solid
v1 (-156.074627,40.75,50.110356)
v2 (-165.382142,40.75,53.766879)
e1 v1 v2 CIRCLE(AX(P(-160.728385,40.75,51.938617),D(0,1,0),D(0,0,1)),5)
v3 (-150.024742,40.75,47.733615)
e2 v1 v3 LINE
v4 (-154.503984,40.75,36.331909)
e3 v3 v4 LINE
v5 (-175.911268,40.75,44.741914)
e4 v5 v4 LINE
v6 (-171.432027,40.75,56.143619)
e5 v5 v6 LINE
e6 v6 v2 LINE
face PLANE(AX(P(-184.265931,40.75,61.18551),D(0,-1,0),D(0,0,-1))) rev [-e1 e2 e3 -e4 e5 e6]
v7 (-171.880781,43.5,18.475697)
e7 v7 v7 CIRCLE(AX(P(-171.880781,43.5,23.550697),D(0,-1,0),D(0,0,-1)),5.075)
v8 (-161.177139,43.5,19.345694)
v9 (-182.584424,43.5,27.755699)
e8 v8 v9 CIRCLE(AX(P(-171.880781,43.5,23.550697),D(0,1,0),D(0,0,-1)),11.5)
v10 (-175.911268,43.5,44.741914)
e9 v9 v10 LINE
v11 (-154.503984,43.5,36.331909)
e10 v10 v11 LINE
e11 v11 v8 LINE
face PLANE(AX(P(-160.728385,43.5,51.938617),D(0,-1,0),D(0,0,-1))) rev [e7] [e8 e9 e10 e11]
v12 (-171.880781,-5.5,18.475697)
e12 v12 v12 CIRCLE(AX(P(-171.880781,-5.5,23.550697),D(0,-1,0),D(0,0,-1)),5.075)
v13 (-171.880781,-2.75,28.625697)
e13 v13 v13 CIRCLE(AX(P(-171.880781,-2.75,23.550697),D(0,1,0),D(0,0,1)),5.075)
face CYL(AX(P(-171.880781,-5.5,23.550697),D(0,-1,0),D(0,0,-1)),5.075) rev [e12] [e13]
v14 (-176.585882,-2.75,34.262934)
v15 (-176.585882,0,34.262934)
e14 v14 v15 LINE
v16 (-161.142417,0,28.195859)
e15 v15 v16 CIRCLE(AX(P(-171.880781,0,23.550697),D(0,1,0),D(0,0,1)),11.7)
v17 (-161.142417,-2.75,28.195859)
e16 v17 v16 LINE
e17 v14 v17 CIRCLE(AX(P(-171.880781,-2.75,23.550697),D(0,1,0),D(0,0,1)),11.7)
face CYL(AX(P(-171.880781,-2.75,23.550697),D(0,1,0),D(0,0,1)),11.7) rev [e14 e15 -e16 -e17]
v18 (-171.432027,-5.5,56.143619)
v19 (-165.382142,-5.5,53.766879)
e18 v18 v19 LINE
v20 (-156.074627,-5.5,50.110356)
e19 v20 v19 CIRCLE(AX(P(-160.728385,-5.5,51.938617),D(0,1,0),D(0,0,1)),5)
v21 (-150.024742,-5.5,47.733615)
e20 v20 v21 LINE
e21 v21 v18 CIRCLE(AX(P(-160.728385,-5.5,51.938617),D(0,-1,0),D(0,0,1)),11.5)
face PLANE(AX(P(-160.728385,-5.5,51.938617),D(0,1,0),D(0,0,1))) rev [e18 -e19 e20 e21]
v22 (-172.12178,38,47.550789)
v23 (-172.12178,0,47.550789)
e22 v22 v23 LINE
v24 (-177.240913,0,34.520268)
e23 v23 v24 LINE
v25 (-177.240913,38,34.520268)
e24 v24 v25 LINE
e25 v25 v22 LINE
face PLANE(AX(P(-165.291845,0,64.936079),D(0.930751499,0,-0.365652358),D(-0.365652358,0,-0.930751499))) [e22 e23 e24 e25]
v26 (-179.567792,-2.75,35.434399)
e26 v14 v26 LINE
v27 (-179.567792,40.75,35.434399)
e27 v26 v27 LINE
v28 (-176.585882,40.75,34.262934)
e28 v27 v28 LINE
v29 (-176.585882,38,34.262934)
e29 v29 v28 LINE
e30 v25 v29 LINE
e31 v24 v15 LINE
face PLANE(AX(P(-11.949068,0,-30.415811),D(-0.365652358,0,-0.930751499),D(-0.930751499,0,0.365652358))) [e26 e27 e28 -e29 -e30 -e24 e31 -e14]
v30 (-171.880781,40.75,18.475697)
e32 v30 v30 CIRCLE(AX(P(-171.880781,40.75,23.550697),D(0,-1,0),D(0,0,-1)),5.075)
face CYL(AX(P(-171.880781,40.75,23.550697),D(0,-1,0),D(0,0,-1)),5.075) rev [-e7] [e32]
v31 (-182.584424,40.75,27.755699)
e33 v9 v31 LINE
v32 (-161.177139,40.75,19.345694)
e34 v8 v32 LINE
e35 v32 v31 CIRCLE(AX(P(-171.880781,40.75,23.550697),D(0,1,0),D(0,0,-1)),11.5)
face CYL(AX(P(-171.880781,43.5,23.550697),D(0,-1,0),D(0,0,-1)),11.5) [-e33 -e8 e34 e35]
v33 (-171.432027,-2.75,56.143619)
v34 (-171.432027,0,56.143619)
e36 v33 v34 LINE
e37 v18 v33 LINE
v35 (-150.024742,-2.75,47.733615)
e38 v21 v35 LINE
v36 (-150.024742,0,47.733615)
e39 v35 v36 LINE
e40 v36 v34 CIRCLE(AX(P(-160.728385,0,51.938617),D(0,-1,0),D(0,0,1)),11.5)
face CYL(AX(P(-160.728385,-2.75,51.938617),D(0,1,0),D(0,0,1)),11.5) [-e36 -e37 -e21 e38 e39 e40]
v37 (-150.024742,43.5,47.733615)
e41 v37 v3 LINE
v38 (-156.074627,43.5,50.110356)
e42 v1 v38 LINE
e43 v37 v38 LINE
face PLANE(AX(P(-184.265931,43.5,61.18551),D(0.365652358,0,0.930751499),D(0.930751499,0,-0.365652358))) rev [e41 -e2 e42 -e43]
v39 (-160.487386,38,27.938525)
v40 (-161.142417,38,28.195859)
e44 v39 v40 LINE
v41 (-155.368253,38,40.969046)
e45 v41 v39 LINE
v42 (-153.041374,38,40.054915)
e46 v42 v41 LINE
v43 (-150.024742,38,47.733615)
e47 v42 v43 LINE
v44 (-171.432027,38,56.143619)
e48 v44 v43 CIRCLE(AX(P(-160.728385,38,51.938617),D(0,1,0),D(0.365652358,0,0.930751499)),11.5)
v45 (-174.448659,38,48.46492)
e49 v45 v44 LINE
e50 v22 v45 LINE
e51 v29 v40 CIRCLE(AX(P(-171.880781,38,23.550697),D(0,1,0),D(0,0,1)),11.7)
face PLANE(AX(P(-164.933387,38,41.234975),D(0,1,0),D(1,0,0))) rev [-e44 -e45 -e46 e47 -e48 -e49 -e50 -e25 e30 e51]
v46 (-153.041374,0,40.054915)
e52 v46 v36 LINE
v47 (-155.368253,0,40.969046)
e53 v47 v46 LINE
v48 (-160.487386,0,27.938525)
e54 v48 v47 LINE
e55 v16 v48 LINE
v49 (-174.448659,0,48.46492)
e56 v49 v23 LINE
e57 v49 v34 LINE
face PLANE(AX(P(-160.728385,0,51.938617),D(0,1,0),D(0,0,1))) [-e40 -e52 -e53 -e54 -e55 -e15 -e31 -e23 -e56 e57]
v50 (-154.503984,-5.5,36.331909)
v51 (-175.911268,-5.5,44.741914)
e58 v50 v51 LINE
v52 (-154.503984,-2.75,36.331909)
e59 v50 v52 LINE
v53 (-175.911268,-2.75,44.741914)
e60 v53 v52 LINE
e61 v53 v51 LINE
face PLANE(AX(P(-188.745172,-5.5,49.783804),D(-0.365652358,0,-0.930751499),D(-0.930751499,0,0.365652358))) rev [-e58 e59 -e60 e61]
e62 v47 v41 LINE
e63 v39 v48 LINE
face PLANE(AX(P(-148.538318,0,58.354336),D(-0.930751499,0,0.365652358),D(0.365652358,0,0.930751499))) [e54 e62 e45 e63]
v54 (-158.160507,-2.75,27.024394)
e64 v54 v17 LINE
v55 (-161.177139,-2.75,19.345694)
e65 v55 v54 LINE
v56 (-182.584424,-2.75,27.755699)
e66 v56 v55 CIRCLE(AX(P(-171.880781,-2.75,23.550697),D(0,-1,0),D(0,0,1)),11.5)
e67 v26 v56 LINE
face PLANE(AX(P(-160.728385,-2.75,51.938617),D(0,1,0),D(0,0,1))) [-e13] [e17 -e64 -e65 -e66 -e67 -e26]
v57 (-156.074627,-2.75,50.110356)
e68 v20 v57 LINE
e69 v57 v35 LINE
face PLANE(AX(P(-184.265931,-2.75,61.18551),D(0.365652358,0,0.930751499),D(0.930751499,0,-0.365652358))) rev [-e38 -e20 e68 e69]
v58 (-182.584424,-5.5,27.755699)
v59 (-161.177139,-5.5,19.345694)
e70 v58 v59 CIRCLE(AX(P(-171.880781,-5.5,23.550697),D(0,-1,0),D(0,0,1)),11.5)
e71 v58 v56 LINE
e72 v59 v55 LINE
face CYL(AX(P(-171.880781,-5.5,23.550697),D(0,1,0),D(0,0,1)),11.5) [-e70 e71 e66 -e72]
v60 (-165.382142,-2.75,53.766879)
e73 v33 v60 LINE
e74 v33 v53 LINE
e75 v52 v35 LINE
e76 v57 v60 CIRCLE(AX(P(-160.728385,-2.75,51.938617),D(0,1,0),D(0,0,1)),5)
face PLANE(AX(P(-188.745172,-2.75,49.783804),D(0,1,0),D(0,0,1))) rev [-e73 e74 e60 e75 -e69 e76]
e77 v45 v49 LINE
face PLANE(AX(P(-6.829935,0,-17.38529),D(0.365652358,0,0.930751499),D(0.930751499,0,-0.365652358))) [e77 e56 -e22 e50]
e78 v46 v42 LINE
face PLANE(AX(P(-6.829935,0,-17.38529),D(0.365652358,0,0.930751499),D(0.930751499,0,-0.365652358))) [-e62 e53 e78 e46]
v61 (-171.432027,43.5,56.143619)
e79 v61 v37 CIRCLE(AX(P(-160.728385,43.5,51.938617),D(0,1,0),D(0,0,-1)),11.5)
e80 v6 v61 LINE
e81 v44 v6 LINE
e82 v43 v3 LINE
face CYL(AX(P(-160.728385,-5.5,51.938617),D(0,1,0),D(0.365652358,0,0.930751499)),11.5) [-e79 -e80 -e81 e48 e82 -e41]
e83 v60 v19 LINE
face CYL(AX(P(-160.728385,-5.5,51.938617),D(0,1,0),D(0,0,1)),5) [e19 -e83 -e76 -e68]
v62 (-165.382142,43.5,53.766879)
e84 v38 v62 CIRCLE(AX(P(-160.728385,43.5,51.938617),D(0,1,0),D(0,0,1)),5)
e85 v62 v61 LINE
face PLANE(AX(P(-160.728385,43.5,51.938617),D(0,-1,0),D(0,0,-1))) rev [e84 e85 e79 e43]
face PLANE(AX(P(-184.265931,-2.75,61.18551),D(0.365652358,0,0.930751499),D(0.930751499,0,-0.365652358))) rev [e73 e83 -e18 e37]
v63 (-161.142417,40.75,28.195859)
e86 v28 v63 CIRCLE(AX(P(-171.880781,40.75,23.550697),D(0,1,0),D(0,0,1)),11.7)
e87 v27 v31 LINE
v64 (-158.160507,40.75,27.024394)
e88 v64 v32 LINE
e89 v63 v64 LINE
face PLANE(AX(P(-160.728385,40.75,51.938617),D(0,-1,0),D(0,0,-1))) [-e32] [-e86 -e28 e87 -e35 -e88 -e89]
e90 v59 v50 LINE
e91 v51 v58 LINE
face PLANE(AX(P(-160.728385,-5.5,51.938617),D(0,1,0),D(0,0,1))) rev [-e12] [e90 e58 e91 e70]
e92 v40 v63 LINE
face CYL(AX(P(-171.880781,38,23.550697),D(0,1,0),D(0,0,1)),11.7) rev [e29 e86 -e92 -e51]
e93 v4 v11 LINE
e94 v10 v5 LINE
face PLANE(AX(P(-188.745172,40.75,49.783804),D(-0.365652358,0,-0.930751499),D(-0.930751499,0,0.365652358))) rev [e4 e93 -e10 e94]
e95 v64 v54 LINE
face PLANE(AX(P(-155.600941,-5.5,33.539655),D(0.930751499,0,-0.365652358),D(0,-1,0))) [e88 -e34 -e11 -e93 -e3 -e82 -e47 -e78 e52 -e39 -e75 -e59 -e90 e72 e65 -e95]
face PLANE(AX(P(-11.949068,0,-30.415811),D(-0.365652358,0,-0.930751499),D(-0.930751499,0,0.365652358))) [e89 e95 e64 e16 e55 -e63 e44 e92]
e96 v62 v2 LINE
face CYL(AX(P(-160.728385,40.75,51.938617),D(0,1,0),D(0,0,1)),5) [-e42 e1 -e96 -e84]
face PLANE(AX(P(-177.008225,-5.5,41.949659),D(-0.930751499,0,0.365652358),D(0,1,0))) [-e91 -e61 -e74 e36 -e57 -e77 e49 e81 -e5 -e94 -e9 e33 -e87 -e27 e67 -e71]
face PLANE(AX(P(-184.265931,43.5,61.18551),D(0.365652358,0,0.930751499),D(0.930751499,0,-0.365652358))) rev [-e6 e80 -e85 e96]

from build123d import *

# Parameters (mm, degrees)
SALIENTE_EXTRUIR1_START   = -2.75
SALIENTE_EXTRUIR1_DEPTH   = 5.5
SALIENTE_EXTRUIR1_2_DEPTH = 2.75
SALIENTE_EXTRUIR2_DEPTH   = 38
SALIENTE_EXTRUIR3_START   = 2.75
SALIENTE_EXTRUIR3_DEPTH   = 2.75
CROQUIS4_W                = 23
CROQUIS4_H                = 43.5
CORTAR_EXTRUIR1_DEPTH     = 8.25
CORTAR_EXTRUIR2_DEPTH     = 2.75
CROQUIS6_W                = 38
CROQUIS6_H                = 22.249999999
CORTAR_EXTRUIR3_DEPTH     = 16.59246817
CROQUIS7_W                = 3.203765914
CROQUIS7_H                = 38
CORTAR_EXTRUIR4_DEPTH     = 8.25
CROQUIS8_W                = 3.203765916
CROQUIS8_H                = 38
CORTAR_EXTRUIR5_DEPTH     = 8.25
CROQUIS9_W                = 14
CROQUIS9_H                = 38
CORTAR_EXTRUIR6_DEPTH     = 0.703765915
CROQUIS10_W               = 14
CROQUIS10_H               = 38
CORTAR_EXTRUIR7_DEPTH     = 0.703765915
SALIENTE_EXTRUIR4_START   = 2.75
SALIENTE_EXTRUIR4_DEPTH   = 2.75
CORTAR_EXTRUIR8_DEPTH     = 2.75
CROQUIS13_W               = 12.249999999
CROQUIS13_H               = 2.75
CORTAR_EXTRUIR9_DEPTH     = 74.034358614
CROQUIS14_W               = 12.249999999
CROQUIS14_H               = 2.75
CORTAR_EXTRUIR10_DEPTH    = 74.034358614
CROQUIS15_W               = 5
CROQUIS15_H               = 2.75
CROQUIS16_W               = 5
CROQUIS16_H               = 2.75
TALADRO1_D                = 10.15
TALADRO1_DEPTH            = 2.75
TALADRO2_D                = 10.15


with BuildPart() as part:
    # Saliente-Extruir1: read off the stored shape, not the designer's step
    # Saliente-Extruir1 outline → Saliente-Extruir1 (new body)
    with BuildSketch(Plane(origin=(0, 40.75, 0), x_dir=(-1, 0, 0), z_dir=(0, 1, 0)).offset(SALIENTE_EXTRUIR1_START)):
        with BuildLine():
            Line((161.177139208, 19.345694485), (182.584423689, 27.755698719))
            Line((182.584423689, 27.755698719), (171.432026769, 56.143619441))
            ThreePointArc((171.432026769, 56.143619441), (156.523382412, 62.642259564), (150.024742289, 47.733615207))
            Line((150.024742289, 47.733615207), (161.177139208, 19.345694485))
        make_face()
    extrude(amount=SALIENTE_EXTRUIR1_DEPTH)

    # Saliente-Extruir1 2 outline → Saliente-Extruir1 2 (add)
    with BuildSketch(Plane(origin=(0, 40.75, 0), x_dir=(-1, 0, 0), z_dir=(0, 1, 0))):
        with BuildLine():
            ThreePointArc((161.177139208, 19.345694485), (176.085783565, 12.847054362), (182.584423687, 27.755698719))
            Line((182.584423687, 27.755698719), (161.177139208, 19.345694485))
        make_face()
    extrude(amount=SALIENTE_EXTRUIR1_2_DEPTH)

    # Croquis2 → Saliente-Extruir2 (add)
    with BuildSketch(Plane.XZ.offset(-38)):
        Polygon((-171.432026768, 56.143619442), (-150.024742288, 47.733615205), (-161.177139209, 19.345694483), (-182.584423689, 27.755698719), align=None)
    extrude(amount=SALIENTE_EXTRUIR2_DEPTH)

    # Croquis3 → Saliente-Extruir3 (add)
    with BuildSketch(Plane.XZ.offset(SALIENTE_EXTRUIR3_START)):
        with BuildLine():
            Line((-182.584423688, 27.755698719), (-171.432026768, 56.143619441))
            ThreePointArc((-171.432026768, 56.143619441), (-156.523382412, 62.642259564), (-150.024742289, 47.733615207))
            Line((-150.024742289, 47.733615207), (-161.177139208, 19.345694485))
            Line((-161.177139208, 19.345694485), (-182.584423688, 27.755698719))
        make_face()
    extrude(amount=-SALIENTE_EXTRUIR3_DEPTH)

    # Croquis4 → Cortar-Extruir1 (cut)
    with BuildSketch(Plane(origin=(-14.965700114, 0, -38.094511116), x_dir=(-0.9307514991056489, 0, 0.3656523580022251), z_dir=(-0.3656523580022251, 0, -0.9307514991056489))):
        with Locations((168.589662745, 19)):
            Rectangle(CROQUIS4_W, CROQUIS4_H)
    extrude(amount=-CORTAR_EXTRUIR1_DEPTH, mode=Mode.SUBTRACT)

    # Croquis5 → Cortar-Extruir2 (cut)
    with BuildSketch(Plane(origin=(0, 40.75, 0), x_dir=(1, 0, 0), z_dir=(0, 1, 0))):
        with BuildLine():
            Line((-161.142417183, -28.195858914), (-176.585881806, -34.262934025))
            ThreePointArc((-176.585881806, -34.262934025), (-167.602648859, -34.440489141), (-161.142417183, -28.195858914))
        make_face()
    extrude(amount=-CORTAR_EXTRUIR2_DEPTH, mode=Mode.SUBTRACT)

    # Croquis6 → Cortar-Extruir3 (cut)
    with BuildSketch(Plane(origin=(-149.193349022, 0, 58.611670162), x_dir=(0, 1, 0), z_dir=(0.9307514991056486, 0, -0.3656523580022258))):
        with Locations((19, -21.553766865)):
            Rectangle(CROQUIS6_W, CROQUIS6_H)
    extrude(amount=-CORTAR_EXTRUIR3_DEPTH, mode=Mode.SUBTRACT)

    # Croquis7 → Cortar-Extruir4 (cut)
    with BuildSketch(Plane(origin=(-3.8133032, 0, -9.706590403), x_dir=(0.9307514990825102, 0, -0.36565235806112356), z_dir=(0.36565235806112356, 0, 0.9307514990825102))):
        with Locations((-158.691545702, 19)):
            Rectangle(CROQUIS7_W, CROQUIS7_H)
    extrude(amount=-CORTAR_EXTRUIR4_DEPTH, mode=Mode.SUBTRACT)

    # Croquis8 → Cortar-Extruir5 (cut)
    with BuildSketch(Plane(origin=(-3.8133032, 0, -9.706590403), x_dir=(0.9307514990825102, 0, -0.36565235806112356), z_dir=(0.36565235806112356, 0, 0.9307514990825102))):
        with Locations((-178.487779787, 19)):
            Rectangle(CROQUIS8_W, CROQUIS8_H)
    extrude(amount=-CORTAR_EXTRUIR5_DEPTH, mode=Mode.SUBTRACT)

    # Croquis9 → Cortar-Extruir6 (cut)
    with BuildSketch(Plane(origin=(-164.636813645, 0, 64.678745273), x_dir=(-0.3656523580022247, 0, -0.930751499105649), z_dir=(0.930751499105649, 1.4355340193330324e-15, -0.3656523580022247))):
        with Locations((25.678766864, 19)):
            Rectangle(CROQUIS9_W, CROQUIS9_H)
    extrude(amount=-CORTAR_EXTRUIR6_DEPTH, mode=Mode.SUBTRACT)

    # Croquis10 → Cortar-Extruir7 (cut)
    with BuildSketch(Plane(origin=(-149.193349022, 0, 58.611670162), x_dir=(0.3656523580022248, 0, 0.930751499105649), z_dir=(-0.930751499105649, -1.4355340193330322e-15, 0.3656523580022248))):
        with Locations((-25.678766864, 19)):
            Rectangle(CROQUIS10_W, CROQUIS10_H)
    extrude(amount=-CORTAR_EXTRUIR7_DEPTH, mode=Mode.SUBTRACT)

    # Croquis11 → Saliente-Extruir4 (add)
    with BuildSketch(Plane.XZ.offset(2.75).offset(SALIENTE_EXTRUIR4_START)):
        with BuildLine():
            Line((-150.024742289, 47.733615207), (-161.177139208, 19.345694485))
            ThreePointArc((-161.177139208, 19.345694485), (-176.085783565, 12.847054362), (-182.584423687, 27.755698719))
            Line((-182.584423687, 27.755698719), (-171.432026769, 56.143619441))
            ThreePointArc((-171.432026769, 56.143619441), (-156.523382412, 62.642259564), (-150.024742289, 47.733615207))
        make_face()
    extrude(amount=-SALIENTE_EXTRUIR4_DEPTH)

    # Croquis12 → Cortar-Extruir8 (cut)
    with BuildSketch(Plane(origin=(0, 0, 0), x_dir=(-1, 0, 0), z_dir=(0, 1, 0))):
        with BuildLine():
            Line((161.142417183, 28.195858914), (176.585881806, 34.262934025))
            ThreePointArc((176.585881806, 34.262934025), (167.602648859, 34.440489141), (161.142417183, 28.195858914))
        make_face()
    extrude(amount=-CORTAR_EXTRUIR8_DEPTH, mode=Mode.SUBTRACT)

    # Croquis13 → Cortar-Extruir9 (cut, through all)
    with BuildSketch(Plane(origin=(-146.211439094, 0, 57.440205601), x_dir=(-0.36565235800222584, 0, -0.9307514991056486), z_dir=(0.9307514991056486, 0, -0.36565235800222584))):
        with Locations((16.553766864, -4.125)):
            Rectangle(CROQUIS13_W, CROQUIS13_H)
    extrude(amount=-CORTAR_EXTRUIR9_DEPTH, mode=Mode.SUBTRACT)

    # Croquis14 → Cortar-Extruir10 (cut, through all)
    with BuildSketch(Plane(origin=(-146.211439094, 0, 57.440205601), x_dir=(-0.36565235800222584, 0, -0.9307514991056486), z_dir=(0.9307514991056486, 0, -0.36565235800222584))):
        with Locations((16.553766864, 42.125)):
            Rectangle(CROQUIS14_W, CROQUIS14_H)
    extrude(amount=-CORTAR_EXTRUIR10_DEPTH, mode=Mode.SUBTRACT)

    # Croquis15 → Revolución1 (revolve)
    with BuildSketch(Plane(origin=(0, 0, 51.938617325), x_dir=(-1, 0, 0), z_dir=(0, 0, -1))):
        with Locations((158.228384529, -4.125)):
            Rectangle(CROQUIS15_W, CROQUIS15_H)
    revolve(axis=Axis((-160.728384529, -5.5, 51.938617325), (0, 1, 0)))

    # Croquis16 → Revolución2 (revolve)
    with BuildSketch(Plane(origin=(0, 0, 51.938617325), x_dir=(-1, 0, 0), z_dir=(0, 0, -1))):
        with Locations((158.228384529, 42.125)):
            Rectangle(CROQUIS16_W, CROQUIS16_H)
    revolve(axis=Axis((-160.728384529, 40.75, 51.938617325), (0, 1, 0)))

    # Taladro1
    with Locations(Plane(origin=(0, -5.5, 0), x_dir=(-1, 0, 0), z_dir=(0, -1, 0))):
        with Locations((171.880781448, -23.550696602)):
            Hole(TALADRO1_D / 2, depth=TALADRO1_DEPTH)

    # Taladro2 (through all)
    with Locations(Plane(origin=(0, 40.75, 0), x_dir=(-1, 0, 0), z_dir=(0, -1, 0))):
        with Locations((171.880781448, -23.550696602)):
            Hole(TALADRO2_D / 2)


solid = part.part
